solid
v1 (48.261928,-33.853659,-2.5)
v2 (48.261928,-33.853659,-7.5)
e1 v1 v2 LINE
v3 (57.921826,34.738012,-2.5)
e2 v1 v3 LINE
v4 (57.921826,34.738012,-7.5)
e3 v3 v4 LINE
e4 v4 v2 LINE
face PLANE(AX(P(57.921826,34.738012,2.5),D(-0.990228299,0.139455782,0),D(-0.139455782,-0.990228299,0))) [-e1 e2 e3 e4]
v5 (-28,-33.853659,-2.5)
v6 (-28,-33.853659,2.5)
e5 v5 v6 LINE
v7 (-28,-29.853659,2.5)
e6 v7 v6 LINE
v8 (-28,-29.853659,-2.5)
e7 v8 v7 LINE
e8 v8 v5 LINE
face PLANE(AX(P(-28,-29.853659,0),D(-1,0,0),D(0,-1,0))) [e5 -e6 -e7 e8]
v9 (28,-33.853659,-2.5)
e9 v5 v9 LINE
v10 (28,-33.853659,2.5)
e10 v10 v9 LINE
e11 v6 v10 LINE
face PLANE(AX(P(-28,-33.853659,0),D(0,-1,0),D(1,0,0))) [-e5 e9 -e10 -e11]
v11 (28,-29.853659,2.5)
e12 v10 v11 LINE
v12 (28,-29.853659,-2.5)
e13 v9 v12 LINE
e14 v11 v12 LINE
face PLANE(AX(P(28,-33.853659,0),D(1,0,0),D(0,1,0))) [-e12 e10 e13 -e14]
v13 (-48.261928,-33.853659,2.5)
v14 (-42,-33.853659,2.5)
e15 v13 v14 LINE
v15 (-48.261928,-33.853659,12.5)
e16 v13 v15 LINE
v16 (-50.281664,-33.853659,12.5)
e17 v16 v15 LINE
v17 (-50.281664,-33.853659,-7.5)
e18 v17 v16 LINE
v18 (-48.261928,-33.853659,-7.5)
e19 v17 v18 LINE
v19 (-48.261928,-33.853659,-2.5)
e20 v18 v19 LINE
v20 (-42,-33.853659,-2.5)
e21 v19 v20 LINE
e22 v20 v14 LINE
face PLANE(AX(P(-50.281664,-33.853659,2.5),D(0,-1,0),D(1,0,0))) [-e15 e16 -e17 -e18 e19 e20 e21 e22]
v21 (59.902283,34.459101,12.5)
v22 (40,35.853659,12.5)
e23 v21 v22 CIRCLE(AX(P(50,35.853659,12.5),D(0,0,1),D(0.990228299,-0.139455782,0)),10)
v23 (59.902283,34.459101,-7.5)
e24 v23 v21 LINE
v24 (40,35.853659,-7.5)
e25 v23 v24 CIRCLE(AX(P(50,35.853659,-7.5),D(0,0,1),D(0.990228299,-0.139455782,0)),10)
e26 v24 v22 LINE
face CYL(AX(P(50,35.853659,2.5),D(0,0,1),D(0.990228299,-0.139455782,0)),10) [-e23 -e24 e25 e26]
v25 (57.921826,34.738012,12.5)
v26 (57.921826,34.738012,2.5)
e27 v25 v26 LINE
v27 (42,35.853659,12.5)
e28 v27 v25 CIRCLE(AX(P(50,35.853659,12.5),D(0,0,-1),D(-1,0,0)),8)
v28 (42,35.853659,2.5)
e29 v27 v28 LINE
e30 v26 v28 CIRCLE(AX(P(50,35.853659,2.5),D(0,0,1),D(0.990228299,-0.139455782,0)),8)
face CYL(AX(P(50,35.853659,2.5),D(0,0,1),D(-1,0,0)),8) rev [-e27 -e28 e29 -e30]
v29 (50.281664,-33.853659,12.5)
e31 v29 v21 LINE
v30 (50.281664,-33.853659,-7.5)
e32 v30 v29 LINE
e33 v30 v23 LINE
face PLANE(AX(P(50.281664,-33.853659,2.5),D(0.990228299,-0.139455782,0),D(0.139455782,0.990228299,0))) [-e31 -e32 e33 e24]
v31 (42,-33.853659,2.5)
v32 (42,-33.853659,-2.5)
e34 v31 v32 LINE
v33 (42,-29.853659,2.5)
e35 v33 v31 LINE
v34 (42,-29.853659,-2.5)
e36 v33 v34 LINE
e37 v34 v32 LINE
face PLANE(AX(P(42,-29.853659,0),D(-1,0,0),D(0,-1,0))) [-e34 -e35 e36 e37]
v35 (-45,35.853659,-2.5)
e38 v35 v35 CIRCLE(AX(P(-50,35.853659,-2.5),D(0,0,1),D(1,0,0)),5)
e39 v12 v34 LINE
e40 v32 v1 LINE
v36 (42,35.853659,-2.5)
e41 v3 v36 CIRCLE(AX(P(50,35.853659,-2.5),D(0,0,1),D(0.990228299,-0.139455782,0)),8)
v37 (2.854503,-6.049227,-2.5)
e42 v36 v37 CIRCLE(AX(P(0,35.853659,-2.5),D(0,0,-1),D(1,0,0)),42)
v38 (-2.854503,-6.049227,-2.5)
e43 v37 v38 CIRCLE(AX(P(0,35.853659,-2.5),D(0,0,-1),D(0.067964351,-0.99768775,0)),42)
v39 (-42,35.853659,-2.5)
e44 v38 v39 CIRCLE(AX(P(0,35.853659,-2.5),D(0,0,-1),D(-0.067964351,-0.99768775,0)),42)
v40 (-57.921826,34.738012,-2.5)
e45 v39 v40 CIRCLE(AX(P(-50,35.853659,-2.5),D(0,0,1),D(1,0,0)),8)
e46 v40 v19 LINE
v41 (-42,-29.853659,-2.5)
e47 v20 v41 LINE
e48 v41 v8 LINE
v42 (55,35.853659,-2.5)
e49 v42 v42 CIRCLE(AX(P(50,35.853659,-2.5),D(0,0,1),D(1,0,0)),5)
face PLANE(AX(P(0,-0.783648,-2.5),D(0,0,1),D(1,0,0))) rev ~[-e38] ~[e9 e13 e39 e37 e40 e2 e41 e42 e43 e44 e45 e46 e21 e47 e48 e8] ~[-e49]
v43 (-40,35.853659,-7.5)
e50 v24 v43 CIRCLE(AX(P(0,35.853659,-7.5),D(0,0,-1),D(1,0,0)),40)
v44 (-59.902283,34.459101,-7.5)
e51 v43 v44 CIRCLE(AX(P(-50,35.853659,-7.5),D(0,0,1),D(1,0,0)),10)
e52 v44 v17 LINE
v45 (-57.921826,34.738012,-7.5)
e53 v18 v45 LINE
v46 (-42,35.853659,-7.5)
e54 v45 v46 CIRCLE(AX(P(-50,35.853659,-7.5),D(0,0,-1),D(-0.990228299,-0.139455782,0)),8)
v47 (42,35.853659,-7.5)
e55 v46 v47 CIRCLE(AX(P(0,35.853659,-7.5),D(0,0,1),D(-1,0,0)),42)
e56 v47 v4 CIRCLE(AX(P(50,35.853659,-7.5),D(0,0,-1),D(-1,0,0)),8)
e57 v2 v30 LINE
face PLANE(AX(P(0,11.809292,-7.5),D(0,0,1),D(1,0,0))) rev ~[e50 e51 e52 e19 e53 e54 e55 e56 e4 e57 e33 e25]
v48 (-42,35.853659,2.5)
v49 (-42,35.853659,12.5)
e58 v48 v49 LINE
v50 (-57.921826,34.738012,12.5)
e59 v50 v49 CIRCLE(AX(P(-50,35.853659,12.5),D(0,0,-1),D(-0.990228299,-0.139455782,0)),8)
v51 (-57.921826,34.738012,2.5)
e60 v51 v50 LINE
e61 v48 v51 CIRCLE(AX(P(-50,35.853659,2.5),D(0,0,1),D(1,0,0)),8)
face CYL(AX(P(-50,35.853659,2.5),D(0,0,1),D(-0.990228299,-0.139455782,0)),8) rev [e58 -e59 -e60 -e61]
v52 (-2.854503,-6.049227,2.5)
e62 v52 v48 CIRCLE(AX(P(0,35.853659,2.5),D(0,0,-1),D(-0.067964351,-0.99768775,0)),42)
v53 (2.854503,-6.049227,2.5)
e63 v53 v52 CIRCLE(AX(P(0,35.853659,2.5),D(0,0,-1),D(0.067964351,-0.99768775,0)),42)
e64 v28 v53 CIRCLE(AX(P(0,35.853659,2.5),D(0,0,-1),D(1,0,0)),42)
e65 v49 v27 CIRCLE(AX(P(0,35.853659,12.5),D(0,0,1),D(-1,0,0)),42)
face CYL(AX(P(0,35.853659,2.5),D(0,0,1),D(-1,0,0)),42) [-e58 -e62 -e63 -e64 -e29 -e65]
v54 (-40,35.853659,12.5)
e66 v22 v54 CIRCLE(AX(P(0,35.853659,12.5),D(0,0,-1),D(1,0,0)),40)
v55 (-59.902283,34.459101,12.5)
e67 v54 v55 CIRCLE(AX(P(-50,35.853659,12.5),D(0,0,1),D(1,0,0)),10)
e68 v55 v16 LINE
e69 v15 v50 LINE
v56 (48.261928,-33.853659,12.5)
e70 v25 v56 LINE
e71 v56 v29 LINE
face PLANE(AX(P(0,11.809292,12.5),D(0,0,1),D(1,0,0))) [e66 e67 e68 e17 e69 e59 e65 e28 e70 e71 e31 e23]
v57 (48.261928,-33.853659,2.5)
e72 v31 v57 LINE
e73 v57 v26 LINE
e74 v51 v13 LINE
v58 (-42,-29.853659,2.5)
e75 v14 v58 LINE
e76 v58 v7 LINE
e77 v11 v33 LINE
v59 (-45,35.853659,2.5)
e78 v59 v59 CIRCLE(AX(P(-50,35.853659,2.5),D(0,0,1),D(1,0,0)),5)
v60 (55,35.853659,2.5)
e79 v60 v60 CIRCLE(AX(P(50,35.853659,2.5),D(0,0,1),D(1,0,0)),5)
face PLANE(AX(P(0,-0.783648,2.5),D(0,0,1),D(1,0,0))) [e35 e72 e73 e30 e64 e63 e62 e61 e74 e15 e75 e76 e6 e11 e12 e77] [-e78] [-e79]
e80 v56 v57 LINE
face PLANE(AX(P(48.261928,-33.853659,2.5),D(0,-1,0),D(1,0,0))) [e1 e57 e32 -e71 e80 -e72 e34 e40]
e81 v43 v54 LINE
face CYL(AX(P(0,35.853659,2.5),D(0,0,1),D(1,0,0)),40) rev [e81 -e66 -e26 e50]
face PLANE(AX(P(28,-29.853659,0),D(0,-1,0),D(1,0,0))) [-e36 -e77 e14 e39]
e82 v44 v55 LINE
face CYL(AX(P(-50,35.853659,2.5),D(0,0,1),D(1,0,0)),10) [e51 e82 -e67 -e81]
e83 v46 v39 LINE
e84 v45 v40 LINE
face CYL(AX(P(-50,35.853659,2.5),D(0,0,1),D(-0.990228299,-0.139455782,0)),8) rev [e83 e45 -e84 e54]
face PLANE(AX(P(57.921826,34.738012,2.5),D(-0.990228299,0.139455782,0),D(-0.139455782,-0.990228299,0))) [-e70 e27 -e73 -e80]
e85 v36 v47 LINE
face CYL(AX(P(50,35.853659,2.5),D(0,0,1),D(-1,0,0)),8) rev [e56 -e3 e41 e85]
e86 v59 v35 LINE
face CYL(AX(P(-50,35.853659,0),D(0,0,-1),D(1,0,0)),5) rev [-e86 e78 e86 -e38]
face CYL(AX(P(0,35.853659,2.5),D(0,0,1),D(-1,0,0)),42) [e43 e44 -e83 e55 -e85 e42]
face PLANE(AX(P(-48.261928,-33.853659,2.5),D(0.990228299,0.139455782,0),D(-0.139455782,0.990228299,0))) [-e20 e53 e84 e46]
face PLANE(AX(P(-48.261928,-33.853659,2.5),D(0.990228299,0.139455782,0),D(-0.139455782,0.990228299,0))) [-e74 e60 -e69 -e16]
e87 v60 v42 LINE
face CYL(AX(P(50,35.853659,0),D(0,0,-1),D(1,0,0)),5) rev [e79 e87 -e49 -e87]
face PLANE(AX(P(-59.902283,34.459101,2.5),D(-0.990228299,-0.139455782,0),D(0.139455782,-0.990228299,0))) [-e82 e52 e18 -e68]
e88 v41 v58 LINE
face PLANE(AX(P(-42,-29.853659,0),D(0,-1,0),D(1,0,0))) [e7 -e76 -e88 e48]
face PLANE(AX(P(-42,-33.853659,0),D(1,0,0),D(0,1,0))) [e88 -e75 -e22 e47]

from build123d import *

# Parameters (mm, degrees)
F0_R     = 5
F1_DEPTH = 2.5
F3_DEPTH = 10


# Not quite as in the source:
# - a feature names something its author has since deleted; it is built from what else it names


with BuildPart() as f1:
    # F0 (on Top) → F1 (new body, symmetric)
    with BuildSketch(Plane.XY):
        with BuildLine():
            ThreePointArc((2.8545027599, -6.0492269011), (0, -6.146341392), (-2.8545027599, -6.0492269011))
            ThreePointArc((-2.8545027599, -6.0492269011), (-30.6911152935, 7.182149369), (-42, 35.853658608))
            ThreePointArc((-42, 35.853658608), (-50.5591908622, 43.8340912767), (-57.9218263949, 34.7380123518))
            Line((-57.9218263949, 34.7380123518), (-48.2619276413, -33.853658608))
            Line((-48.2619276413, -33.853658608), (-42, -33.853658608))
            Line((-42, -33.853658608), (-42, -29.853658608))
            Line((-42, -29.853658608), (-28, -29.853658608))
            Line((-28, -29.853658608), (-28, -33.853658608))
            Line((-28, -33.853658608), (28, -33.853658608))
            Line((28, -33.853658608), (28, -29.853658608))
            Line((28, -29.853658608), (42, -29.853658608))
            Line((42, -29.853658608), (42, -33.853658608))
            Line((42, -33.853658608), (48.2619276413, -33.853658608))
            Line((48.2619276413, -33.853658608), (57.9218263949, 34.7380123518))
            ThreePointArc((57.9218263949, 34.7380123518), (50.5591908622, 43.8340912767), (42, 35.853658608))
            ThreePointArc((42, 35.853658608), (30.6911152935, 7.182149369), (2.8545027599, -6.0492269011))
        make_face()
        with Locations((-50, 35.853658608)):
            Circle(F0_R, mode=Mode.SUBTRACT)
        with Locations((50, 35.853658608)):
            Circle(F0_R, mode=Mode.SUBTRACT)
    extrude(amount=F1_DEPTH, both=True)

    # F2 (on face) → F3 (join, symmetric)
    with BuildSketch(Plane.XY.offset(2.5)):
        with BuildLine():
            Line((48.2619276413, -33.853658608), (50.2816638994, -33.853658608))
            Line((50.2816638994, -33.853658608), (59.9022829936, 34.4591007877))
            ThreePointArc((59.9022829936, 34.4591007877), (50.6989885778, 45.8291994439), (40, 35.853658608))
            ThreePointArc((40, 35.853658608), (0, -4.146341392), (-40, 35.853658608))
            ThreePointArc((-40, 35.853658608), (-50.6989885778, 45.8291994439), (-59.9022829936, 34.4591007877))
            Line((-59.9022829936, 34.4591007877), (-50.2816638994, -33.853658608))
            Line((-50.2816638994, -33.853658608), (-48.2619276413, -33.853658608))
            Line((-48.2619276413, -33.853658608), (-57.9218263949, 34.7380123518))
            ThreePointArc((-57.9218263949, 34.7380123518), (-50.5591908622, 43.8340912767), (-42, 35.853658608))
            ThreePointArc((-42, 35.853658608), (0, -6.146341392), (42, 35.853658608))
            ThreePointArc((42, 35.853658608), (50.5591908622, 43.8340912767), (57.9218263949, 34.7380123518))
            Line((57.9218263949, 34.7380123518), (48.2619276413, -33.853658608))
        make_face()
    extrude(amount=F3_DEPTH, both=True)


solid = f1.part
